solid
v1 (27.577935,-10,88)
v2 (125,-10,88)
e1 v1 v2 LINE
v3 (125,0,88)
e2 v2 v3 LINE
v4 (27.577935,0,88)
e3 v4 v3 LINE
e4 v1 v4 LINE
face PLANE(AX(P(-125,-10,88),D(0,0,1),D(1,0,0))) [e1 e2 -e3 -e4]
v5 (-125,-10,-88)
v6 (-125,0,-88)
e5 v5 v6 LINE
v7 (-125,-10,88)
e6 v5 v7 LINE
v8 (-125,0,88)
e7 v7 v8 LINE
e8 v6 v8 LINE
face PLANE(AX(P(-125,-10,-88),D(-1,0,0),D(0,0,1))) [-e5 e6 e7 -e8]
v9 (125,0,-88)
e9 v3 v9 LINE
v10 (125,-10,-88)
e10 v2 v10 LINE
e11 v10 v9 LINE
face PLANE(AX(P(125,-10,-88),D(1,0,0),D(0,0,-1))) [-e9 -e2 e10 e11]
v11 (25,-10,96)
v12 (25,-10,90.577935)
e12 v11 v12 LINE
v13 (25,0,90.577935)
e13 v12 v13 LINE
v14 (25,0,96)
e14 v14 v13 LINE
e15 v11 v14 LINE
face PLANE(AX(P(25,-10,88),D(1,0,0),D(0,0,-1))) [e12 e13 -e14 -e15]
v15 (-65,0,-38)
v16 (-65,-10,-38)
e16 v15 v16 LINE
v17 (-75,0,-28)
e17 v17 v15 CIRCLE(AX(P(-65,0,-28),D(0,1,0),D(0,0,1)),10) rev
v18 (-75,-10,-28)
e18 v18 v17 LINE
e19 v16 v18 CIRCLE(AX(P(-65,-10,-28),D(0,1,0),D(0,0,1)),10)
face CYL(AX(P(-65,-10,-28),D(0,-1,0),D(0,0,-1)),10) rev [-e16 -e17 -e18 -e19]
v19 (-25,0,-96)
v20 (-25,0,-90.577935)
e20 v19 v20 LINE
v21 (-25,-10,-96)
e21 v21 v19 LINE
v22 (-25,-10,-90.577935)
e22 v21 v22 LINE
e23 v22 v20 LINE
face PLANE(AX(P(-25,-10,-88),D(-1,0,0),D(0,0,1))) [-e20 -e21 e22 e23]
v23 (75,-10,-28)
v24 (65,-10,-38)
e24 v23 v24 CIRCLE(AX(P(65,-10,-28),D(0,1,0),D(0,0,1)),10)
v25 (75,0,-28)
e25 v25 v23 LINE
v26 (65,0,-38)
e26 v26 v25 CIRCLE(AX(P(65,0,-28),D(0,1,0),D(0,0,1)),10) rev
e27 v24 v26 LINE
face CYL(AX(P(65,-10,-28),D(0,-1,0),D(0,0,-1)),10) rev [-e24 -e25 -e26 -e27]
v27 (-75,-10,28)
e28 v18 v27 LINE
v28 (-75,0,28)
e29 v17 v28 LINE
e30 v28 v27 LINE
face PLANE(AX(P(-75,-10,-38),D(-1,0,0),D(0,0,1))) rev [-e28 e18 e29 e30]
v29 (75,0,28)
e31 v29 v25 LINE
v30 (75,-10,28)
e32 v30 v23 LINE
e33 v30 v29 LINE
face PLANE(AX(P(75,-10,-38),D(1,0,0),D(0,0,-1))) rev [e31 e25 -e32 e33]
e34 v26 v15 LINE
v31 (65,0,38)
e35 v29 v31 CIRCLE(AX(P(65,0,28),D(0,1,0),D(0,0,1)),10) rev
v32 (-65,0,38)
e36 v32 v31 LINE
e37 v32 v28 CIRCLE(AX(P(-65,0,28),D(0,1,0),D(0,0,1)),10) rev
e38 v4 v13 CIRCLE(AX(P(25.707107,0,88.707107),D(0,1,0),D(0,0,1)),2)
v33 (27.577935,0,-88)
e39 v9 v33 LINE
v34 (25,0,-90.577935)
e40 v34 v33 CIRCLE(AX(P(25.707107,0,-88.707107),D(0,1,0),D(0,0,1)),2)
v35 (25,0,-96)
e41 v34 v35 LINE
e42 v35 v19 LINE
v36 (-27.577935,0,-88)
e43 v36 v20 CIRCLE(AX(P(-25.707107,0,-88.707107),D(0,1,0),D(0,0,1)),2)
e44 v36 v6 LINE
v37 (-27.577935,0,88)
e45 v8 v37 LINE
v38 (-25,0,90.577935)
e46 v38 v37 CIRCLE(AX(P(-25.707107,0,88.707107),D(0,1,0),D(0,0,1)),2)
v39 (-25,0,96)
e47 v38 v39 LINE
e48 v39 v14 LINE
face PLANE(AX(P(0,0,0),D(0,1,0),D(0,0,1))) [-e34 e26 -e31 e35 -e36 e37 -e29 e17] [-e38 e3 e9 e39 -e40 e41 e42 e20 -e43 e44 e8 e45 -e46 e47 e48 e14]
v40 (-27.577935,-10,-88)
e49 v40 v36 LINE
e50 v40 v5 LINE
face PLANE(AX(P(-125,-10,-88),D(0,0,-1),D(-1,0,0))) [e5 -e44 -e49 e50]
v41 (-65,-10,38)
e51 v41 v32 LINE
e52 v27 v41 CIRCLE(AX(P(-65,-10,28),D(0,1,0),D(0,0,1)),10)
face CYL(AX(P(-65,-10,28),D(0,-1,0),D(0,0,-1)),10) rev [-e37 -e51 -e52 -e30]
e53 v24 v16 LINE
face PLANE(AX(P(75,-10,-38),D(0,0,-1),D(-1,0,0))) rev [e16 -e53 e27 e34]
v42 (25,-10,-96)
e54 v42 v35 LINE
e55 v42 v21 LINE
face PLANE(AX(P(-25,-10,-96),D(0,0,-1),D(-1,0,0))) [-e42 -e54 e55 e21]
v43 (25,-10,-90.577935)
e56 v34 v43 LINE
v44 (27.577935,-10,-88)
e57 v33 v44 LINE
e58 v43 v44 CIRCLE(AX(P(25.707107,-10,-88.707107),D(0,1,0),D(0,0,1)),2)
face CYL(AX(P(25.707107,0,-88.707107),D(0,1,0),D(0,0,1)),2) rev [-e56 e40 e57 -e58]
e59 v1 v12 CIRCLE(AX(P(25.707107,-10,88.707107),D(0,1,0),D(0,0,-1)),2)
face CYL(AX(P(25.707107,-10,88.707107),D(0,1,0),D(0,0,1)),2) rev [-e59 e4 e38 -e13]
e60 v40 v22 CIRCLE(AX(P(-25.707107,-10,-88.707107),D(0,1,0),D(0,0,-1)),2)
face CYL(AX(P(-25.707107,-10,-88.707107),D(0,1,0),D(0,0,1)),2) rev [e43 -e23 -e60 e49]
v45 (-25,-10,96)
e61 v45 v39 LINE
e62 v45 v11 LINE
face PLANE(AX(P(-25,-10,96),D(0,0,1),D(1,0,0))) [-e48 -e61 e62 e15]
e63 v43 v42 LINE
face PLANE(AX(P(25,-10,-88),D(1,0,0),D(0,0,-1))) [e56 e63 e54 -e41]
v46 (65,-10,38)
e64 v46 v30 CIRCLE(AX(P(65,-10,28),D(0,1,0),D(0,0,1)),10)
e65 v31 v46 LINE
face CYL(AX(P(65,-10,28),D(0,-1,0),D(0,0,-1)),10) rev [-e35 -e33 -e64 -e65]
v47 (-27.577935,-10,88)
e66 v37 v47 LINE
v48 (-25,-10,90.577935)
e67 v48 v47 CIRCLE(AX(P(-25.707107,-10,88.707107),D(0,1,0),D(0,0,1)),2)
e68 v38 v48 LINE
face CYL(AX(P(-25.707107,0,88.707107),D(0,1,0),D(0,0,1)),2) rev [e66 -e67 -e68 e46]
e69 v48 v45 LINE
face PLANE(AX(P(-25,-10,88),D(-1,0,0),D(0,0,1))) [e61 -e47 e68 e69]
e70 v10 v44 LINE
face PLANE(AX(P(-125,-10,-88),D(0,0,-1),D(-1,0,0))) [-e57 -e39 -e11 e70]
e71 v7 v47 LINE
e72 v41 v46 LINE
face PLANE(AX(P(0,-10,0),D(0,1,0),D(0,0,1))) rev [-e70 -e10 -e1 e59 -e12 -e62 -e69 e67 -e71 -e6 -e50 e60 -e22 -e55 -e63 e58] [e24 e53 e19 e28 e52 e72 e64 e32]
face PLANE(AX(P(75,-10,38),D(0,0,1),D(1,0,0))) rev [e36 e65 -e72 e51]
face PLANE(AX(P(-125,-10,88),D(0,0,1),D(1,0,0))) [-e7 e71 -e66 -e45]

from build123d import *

# Parameters (mm, degrees)
SKETCH1_W           = 250
SKETCH1_H           = 176
BASE_FLANGE1_DEPTH  = 10
SKETCH6_W           = 50
SKETCH6_H           = 8
BOSS_EXTRUDE1_DEPTH = 10
SKETCH7_R           = 2
CUT_EXTRUDE1_DEPTH  = 158.927198417
SKETCH8_W           = 150
SKETCH8_H           = 76
CUT_EXTRUDE2_DEPTH  = 158.927198417
FILLET1_R           = 10


# Sheet-metal steps are written as plain solids
with BuildPart() as part:
    # Sketch1 → Base-Flange1 (new body)
    with BuildSketch(Plane(origin=(0, 0, 0), x_dir=(1, 0, 0), z_dir=(0, 1, 0))):
        Rectangle(SKETCH1_W, SKETCH1_H)
    extrude(amount=-BASE_FLANGE1_DEPTH)

    # Sketch6 → Boss-Extrude1 (add)
    with BuildSketch(Plane(origin=(0, 0, 0), x_dir=(1, 0, 0), z_dir=(0, 1, 0))):
        with Locations((0, 92)):
            Rectangle(SKETCH6_W, SKETCH6_H)
        with Locations((0, -92)):
            Rectangle(SKETCH6_W, SKETCH6_H)
    extrude(amount=-BOSS_EXTRUDE1_DEPTH)

    # Sketch7 → Cut-Extrude1 (cut, through all)
    with BuildSketch(Plane(origin=(0, 0, 0), x_dir=(1, 0, 0), z_dir=(0, 1, 0))):
        with Locations((25.707106781, 88.707106781)):
            Circle(SKETCH7_R)
        with Locations((-25.707106781, 88.707106781)):
            Circle(SKETCH7_R)
        with Locations((-25.707106781, -88.707106781)):
            Circle(SKETCH7_R)
        with Locations((25.707106781, -88.707106781)):
            Circle(SKETCH7_R)
    extrude(amount=-CUT_EXTRUDE1_DEPTH, mode=Mode.SUBTRACT)

    # Sketch8 → Cut-Extrude2 (cut, through all)
    with BuildSketch(Plane(origin=(0, 0, 0), x_dir=(1, 0, 0), z_dir=(0, 1, 0))):
        Rectangle(SKETCH8_W, SKETCH8_H)
    extrude(amount=-CUT_EXTRUDE2_DEPTH, mode=Mode.SUBTRACT)

    # Fillet1
    fillet1_edges = [part.edges().sort_by_distance(p)[0] for p in [
        (-75, -5, 38),
        (-75, -5, -38),
        (75, -5, -38),
        (75, -5, 38),
    ]]
    fillet(fillet1_edges, radius=FILLET1_R)


solid = part.part
